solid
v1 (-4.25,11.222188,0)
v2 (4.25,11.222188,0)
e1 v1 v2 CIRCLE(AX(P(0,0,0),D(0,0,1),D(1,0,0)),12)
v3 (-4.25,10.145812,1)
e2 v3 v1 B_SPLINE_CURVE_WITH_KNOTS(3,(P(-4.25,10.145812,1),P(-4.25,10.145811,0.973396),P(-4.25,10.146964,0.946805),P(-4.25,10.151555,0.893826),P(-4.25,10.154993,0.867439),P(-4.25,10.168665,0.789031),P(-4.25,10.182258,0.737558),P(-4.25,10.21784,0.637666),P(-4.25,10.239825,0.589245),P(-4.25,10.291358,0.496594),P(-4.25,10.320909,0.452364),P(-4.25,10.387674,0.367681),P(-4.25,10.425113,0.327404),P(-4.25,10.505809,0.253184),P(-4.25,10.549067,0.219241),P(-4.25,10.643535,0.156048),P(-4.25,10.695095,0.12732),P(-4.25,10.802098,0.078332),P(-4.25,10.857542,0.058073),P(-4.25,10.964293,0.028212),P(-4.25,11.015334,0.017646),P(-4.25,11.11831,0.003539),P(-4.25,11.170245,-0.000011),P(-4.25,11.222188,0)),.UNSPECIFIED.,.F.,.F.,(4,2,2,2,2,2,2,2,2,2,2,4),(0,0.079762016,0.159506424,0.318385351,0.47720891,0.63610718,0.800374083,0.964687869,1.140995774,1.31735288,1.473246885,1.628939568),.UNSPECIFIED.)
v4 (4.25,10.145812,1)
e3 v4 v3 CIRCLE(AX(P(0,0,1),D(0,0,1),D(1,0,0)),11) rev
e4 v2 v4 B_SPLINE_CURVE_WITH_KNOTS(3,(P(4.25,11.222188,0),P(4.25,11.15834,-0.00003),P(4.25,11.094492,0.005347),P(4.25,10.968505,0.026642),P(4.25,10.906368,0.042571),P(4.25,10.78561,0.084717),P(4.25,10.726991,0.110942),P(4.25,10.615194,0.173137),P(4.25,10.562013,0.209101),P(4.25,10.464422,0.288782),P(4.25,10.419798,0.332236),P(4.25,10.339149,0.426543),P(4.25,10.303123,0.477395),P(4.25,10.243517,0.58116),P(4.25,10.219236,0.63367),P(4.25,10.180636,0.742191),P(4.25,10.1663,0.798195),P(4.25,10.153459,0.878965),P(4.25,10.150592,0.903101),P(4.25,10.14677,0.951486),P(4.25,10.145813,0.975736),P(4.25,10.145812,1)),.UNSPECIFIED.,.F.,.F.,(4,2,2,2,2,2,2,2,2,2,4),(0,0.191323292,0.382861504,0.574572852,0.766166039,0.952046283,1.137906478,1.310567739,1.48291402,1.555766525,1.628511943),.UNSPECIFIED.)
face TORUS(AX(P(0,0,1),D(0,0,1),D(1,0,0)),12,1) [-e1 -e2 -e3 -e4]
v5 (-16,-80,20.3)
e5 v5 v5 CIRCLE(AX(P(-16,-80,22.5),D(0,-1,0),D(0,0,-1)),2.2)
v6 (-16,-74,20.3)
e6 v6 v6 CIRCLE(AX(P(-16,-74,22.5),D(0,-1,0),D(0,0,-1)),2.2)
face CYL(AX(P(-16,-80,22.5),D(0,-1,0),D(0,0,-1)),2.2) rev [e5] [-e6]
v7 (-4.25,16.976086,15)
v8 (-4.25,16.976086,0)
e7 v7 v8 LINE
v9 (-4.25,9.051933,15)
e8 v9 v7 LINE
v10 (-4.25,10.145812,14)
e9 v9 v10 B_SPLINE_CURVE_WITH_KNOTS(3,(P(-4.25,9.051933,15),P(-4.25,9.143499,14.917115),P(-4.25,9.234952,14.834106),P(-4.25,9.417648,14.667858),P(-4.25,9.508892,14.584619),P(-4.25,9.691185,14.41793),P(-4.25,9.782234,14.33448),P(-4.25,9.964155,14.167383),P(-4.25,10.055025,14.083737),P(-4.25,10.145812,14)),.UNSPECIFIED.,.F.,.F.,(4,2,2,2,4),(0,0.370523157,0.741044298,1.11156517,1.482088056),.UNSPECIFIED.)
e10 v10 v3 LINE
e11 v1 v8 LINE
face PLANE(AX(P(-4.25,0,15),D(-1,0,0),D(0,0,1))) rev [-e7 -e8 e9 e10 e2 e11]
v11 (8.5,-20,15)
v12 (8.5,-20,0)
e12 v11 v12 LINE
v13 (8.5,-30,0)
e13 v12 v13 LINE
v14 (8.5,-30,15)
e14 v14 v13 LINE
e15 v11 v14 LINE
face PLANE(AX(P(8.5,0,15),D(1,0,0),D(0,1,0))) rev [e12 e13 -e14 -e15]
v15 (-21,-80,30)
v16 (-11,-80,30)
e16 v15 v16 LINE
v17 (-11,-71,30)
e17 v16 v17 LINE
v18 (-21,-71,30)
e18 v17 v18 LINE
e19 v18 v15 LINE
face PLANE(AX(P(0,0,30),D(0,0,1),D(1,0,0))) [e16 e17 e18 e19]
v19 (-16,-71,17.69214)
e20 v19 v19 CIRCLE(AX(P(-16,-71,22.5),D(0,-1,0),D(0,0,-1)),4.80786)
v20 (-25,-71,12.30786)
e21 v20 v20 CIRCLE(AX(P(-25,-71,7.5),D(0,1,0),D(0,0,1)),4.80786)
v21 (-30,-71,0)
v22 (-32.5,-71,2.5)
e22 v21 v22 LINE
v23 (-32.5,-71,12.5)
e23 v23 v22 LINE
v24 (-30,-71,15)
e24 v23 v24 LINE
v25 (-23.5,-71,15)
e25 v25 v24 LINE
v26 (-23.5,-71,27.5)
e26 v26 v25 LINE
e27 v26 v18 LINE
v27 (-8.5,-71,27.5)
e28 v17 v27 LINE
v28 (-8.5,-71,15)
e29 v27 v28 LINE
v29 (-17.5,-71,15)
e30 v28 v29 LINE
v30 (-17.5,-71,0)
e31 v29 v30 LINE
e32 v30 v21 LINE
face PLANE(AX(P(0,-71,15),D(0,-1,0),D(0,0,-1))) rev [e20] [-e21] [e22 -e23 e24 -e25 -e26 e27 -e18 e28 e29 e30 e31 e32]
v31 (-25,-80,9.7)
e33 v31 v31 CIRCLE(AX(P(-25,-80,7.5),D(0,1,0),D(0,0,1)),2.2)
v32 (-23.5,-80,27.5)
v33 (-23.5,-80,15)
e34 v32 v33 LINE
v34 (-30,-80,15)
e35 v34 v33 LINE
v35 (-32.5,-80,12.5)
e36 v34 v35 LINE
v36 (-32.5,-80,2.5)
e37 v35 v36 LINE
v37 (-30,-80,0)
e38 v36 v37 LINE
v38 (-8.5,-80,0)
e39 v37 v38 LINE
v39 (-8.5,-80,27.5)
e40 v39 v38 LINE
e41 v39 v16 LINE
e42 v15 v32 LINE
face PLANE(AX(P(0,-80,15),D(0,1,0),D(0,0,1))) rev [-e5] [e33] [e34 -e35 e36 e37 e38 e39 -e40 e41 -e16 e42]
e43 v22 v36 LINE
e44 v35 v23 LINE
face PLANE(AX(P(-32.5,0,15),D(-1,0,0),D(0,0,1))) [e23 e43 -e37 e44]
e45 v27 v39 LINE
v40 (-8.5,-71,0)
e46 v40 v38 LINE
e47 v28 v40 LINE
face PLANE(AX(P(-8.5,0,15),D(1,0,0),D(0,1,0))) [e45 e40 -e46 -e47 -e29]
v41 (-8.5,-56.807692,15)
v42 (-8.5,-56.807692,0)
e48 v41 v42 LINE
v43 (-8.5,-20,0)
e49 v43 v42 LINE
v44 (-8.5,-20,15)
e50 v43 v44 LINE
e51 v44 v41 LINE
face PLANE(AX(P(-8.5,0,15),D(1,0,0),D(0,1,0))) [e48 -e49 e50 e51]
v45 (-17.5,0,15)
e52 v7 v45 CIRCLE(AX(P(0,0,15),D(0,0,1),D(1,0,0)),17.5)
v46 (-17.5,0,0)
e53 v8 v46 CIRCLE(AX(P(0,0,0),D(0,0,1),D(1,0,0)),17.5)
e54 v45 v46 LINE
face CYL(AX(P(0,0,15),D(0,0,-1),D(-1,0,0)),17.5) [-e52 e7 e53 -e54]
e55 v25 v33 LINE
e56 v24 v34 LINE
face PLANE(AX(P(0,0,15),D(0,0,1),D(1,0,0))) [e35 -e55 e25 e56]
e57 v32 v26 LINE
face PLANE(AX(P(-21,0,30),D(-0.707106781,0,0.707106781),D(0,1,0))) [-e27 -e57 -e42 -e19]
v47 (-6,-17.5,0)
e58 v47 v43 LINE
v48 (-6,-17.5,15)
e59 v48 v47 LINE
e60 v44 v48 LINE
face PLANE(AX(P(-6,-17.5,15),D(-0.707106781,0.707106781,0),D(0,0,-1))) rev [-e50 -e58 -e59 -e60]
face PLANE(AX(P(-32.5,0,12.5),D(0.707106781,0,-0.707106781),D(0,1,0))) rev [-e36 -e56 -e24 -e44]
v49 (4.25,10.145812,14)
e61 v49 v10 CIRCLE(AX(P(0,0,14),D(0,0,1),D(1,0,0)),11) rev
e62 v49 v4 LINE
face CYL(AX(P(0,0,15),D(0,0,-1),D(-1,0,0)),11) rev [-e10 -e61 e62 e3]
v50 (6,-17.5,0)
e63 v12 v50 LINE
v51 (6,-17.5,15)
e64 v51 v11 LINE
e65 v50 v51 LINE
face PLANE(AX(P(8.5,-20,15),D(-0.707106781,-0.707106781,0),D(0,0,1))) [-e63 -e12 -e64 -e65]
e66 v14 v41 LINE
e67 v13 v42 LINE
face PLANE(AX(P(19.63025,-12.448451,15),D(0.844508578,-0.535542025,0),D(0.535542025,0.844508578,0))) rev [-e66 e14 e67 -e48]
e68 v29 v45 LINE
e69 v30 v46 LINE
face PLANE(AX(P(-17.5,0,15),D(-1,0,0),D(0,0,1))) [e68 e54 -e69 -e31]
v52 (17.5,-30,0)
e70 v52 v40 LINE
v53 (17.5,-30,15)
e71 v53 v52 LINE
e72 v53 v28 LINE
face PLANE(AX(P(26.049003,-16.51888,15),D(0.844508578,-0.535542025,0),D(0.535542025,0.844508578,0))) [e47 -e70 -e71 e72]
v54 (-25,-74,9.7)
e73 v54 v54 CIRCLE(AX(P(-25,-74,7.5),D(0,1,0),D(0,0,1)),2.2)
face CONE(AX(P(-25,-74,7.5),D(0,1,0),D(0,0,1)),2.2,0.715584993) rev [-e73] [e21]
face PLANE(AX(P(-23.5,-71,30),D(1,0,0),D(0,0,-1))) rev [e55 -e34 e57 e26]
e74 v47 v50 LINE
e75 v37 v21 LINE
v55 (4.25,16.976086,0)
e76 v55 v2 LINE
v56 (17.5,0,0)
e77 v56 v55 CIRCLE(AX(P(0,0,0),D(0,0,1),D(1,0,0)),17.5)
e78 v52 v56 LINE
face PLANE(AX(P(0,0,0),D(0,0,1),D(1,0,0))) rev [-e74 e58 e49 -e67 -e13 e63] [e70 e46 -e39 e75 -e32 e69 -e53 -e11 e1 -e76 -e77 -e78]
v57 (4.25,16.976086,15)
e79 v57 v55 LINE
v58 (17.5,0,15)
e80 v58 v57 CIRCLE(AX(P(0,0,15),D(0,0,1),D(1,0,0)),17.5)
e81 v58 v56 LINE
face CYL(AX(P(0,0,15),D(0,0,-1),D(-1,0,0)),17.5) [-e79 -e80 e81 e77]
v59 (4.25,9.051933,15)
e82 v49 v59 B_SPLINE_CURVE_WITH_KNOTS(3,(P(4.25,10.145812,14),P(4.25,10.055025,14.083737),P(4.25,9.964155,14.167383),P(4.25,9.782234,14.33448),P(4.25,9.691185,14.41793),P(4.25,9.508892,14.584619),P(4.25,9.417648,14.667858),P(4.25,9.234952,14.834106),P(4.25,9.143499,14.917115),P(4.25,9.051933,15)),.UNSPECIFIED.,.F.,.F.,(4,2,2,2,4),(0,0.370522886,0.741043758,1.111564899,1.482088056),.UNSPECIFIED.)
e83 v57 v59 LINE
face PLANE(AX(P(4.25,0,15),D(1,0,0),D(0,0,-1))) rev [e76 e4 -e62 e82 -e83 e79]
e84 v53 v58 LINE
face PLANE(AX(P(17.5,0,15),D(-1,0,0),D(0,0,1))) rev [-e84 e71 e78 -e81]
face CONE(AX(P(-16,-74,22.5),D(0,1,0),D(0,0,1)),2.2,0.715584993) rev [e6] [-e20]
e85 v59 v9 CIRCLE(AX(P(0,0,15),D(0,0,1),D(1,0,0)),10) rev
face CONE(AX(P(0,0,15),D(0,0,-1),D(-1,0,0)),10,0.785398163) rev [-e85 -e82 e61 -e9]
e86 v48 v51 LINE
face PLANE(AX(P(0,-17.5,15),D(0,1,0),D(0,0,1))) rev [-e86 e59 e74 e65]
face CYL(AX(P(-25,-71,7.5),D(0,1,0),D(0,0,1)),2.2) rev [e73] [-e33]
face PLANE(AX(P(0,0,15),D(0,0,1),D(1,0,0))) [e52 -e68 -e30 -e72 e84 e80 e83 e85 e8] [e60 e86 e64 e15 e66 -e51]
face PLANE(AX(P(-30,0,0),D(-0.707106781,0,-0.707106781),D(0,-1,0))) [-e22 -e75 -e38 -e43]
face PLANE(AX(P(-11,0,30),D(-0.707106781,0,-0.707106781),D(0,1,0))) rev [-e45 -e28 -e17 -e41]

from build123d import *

# Parameters (mm, degrees)
BOSS_EXTRUDE1_DEPTH = 15
BOSS_EXTRUDE3_START = 1
BOSS_EXTRUDE3_DEPTH = 1
SKETCH7_W           = 15
SKETCH7_H           = 9
BOSS_EXTRUDE4_DEPTH = 15
FILLET1_R           = 1
CHAMFER1_SIZE       = 2.5
CHAMFER2_SIZE       = 1


with BuildPart() as part:
    # Sketch1 → Boss-Extrude1 (new body)
    with BuildSketch(Plane.XY):
        with BuildLine():
            Line((-8.5, -71), (17.5, -30))
            Line((17.5, -30), (17.5, 0))
            ThreePointArc((17.5, 0), (13.795379661, 10.767427734), (4.25, 16.976086121))
            Line((4.25, 16.976086121), (4.25, 10.145811944))
            ThreePointArc((4.25, 10.145811944), (0, -11), (-4.25, 10.145811944))
            Line((-4.25, 10.145811944), (-4.25, 16.976086121))
            ThreePointArc((-4.25, 16.976086121), (-13.795379661, 10.767427734), (-17.5, 0))
            Line((-17.5, 0), (-17.5, -71))
            Line((-17.5, -71), (-32.5, -71))
            Line((-32.5, -71), (-32.5, -80))
            Line((-32.5, -80), (-8.5, -80))
            Line((-8.5, -80), (-8.5, -71))
        make_face()
        Polygon((8.5, -17.5), (8.5, -30), (-8.5, -56.807692308), (-8.5, -17.5), align=None, mode=Mode.SUBTRACT)
    extrude(amount=BOSS_EXTRUDE1_DEPTH)

    # Sketch6 → Boss-Extrude3 (add)
    with BuildSketch(Plane(origin=(0, 0, 15), x_dir=(-1, 0, 0), z_dir=(0, 0, -1)).offset(BOSS_EXTRUDE3_START)):
        with BuildLine():
            Line((-4.25, 9.051933495), (-4.25, 10.145811944))
            ThreePointArc((-4.25, 10.145811944), (-6.093028803, -9.158329542), (11, 0))
            ThreePointArc((11, 0), (9.158329542, 6.093028803), (4.25, 10.145811944))
            Line((4.25, 10.145811944), (4.25, 9.051933495))
            ThreePointArc((4.25, 9.051933495), (8.440971508, 5.361902647), (10, 0))
            ThreePointArc((10, 0), (-5.361902647, -8.440971508), (-4.25, 9.051933495))
        make_face()
    extrude(amount=-BOSS_EXTRUDE3_DEPTH)

    # Sketch7 → Boss-Extrude4 (add)
    with BuildSketch(Plane.XY.offset(15)):
        with Locations((-16, -75.5)):
            Rectangle(SKETCH7_W, SKETCH7_H)
    extrude(amount=BOSS_EXTRUDE4_DEPTH)

    # Sketch11 → Cut-Revolve4 (revolve, cut)
    with BuildSketch(Plane.ZY.offset(25)):
        Polygon((7.5, -71), (7.5, -80), (9.7, -80), (9.7, -74), (12.307860213, -71), align=None)
    revolve(axis=Axis((-25, -71, 7.5), (0, -1, 0)), mode=Mode.SUBTRACT)

    # Sketch10 → Cut-Revolve3 (revolve, cut)
    with BuildSketch(Plane.XY.offset(22.5), mode=Mode.PRIVATE) as cut_revolve3_sk:
        Polygon((-16, -71), (-11.192139787, -71), (-13.8, -74), (-13.8, -80), (-16, -80), align=None)
    revolve(cut_revolve3_sk.sketch.rotate(Axis((-16, -80, 22.5), (0, 1, 0)), 90), axis=Axis((-16, -80, 22.5), (0, 1, 0)), mode=Mode.SUBTRACT)

    # Fillet1
    fillet1_edges = [part.edges().sort_by_distance(p)[0] for p in [
        (0, -11, 0),
    ]]
    fillet(fillet1_edges, radius=FILLET1_R)

    # Chamfer1
    chamfer1_edges = [part.edges().sort_by_distance(p)[0] for p in [
        (-32.5, -75.5, 0),
        (-8.5, -17.5, 7.5),
        (8.5, -17.5, 7.5),
        (-32.5, -75.5, 15),
        (-23.5, -75.5, 30),
        (-8.5, -75.5, 30),
    ]]
    chamfer(chamfer1_edges, length=CHAMFER1_SIZE)

    # Chamfer2
    chamfer2_edges = [part.edges().sort_by_distance(p)[0] for p in [
        (0, -10, 14),
    ]]
    chamfer(chamfer2_edges, length=CHAMFER2_SIZE - 0.0001)  # a hair under: the kernel refuses the full size


solid = part.part
